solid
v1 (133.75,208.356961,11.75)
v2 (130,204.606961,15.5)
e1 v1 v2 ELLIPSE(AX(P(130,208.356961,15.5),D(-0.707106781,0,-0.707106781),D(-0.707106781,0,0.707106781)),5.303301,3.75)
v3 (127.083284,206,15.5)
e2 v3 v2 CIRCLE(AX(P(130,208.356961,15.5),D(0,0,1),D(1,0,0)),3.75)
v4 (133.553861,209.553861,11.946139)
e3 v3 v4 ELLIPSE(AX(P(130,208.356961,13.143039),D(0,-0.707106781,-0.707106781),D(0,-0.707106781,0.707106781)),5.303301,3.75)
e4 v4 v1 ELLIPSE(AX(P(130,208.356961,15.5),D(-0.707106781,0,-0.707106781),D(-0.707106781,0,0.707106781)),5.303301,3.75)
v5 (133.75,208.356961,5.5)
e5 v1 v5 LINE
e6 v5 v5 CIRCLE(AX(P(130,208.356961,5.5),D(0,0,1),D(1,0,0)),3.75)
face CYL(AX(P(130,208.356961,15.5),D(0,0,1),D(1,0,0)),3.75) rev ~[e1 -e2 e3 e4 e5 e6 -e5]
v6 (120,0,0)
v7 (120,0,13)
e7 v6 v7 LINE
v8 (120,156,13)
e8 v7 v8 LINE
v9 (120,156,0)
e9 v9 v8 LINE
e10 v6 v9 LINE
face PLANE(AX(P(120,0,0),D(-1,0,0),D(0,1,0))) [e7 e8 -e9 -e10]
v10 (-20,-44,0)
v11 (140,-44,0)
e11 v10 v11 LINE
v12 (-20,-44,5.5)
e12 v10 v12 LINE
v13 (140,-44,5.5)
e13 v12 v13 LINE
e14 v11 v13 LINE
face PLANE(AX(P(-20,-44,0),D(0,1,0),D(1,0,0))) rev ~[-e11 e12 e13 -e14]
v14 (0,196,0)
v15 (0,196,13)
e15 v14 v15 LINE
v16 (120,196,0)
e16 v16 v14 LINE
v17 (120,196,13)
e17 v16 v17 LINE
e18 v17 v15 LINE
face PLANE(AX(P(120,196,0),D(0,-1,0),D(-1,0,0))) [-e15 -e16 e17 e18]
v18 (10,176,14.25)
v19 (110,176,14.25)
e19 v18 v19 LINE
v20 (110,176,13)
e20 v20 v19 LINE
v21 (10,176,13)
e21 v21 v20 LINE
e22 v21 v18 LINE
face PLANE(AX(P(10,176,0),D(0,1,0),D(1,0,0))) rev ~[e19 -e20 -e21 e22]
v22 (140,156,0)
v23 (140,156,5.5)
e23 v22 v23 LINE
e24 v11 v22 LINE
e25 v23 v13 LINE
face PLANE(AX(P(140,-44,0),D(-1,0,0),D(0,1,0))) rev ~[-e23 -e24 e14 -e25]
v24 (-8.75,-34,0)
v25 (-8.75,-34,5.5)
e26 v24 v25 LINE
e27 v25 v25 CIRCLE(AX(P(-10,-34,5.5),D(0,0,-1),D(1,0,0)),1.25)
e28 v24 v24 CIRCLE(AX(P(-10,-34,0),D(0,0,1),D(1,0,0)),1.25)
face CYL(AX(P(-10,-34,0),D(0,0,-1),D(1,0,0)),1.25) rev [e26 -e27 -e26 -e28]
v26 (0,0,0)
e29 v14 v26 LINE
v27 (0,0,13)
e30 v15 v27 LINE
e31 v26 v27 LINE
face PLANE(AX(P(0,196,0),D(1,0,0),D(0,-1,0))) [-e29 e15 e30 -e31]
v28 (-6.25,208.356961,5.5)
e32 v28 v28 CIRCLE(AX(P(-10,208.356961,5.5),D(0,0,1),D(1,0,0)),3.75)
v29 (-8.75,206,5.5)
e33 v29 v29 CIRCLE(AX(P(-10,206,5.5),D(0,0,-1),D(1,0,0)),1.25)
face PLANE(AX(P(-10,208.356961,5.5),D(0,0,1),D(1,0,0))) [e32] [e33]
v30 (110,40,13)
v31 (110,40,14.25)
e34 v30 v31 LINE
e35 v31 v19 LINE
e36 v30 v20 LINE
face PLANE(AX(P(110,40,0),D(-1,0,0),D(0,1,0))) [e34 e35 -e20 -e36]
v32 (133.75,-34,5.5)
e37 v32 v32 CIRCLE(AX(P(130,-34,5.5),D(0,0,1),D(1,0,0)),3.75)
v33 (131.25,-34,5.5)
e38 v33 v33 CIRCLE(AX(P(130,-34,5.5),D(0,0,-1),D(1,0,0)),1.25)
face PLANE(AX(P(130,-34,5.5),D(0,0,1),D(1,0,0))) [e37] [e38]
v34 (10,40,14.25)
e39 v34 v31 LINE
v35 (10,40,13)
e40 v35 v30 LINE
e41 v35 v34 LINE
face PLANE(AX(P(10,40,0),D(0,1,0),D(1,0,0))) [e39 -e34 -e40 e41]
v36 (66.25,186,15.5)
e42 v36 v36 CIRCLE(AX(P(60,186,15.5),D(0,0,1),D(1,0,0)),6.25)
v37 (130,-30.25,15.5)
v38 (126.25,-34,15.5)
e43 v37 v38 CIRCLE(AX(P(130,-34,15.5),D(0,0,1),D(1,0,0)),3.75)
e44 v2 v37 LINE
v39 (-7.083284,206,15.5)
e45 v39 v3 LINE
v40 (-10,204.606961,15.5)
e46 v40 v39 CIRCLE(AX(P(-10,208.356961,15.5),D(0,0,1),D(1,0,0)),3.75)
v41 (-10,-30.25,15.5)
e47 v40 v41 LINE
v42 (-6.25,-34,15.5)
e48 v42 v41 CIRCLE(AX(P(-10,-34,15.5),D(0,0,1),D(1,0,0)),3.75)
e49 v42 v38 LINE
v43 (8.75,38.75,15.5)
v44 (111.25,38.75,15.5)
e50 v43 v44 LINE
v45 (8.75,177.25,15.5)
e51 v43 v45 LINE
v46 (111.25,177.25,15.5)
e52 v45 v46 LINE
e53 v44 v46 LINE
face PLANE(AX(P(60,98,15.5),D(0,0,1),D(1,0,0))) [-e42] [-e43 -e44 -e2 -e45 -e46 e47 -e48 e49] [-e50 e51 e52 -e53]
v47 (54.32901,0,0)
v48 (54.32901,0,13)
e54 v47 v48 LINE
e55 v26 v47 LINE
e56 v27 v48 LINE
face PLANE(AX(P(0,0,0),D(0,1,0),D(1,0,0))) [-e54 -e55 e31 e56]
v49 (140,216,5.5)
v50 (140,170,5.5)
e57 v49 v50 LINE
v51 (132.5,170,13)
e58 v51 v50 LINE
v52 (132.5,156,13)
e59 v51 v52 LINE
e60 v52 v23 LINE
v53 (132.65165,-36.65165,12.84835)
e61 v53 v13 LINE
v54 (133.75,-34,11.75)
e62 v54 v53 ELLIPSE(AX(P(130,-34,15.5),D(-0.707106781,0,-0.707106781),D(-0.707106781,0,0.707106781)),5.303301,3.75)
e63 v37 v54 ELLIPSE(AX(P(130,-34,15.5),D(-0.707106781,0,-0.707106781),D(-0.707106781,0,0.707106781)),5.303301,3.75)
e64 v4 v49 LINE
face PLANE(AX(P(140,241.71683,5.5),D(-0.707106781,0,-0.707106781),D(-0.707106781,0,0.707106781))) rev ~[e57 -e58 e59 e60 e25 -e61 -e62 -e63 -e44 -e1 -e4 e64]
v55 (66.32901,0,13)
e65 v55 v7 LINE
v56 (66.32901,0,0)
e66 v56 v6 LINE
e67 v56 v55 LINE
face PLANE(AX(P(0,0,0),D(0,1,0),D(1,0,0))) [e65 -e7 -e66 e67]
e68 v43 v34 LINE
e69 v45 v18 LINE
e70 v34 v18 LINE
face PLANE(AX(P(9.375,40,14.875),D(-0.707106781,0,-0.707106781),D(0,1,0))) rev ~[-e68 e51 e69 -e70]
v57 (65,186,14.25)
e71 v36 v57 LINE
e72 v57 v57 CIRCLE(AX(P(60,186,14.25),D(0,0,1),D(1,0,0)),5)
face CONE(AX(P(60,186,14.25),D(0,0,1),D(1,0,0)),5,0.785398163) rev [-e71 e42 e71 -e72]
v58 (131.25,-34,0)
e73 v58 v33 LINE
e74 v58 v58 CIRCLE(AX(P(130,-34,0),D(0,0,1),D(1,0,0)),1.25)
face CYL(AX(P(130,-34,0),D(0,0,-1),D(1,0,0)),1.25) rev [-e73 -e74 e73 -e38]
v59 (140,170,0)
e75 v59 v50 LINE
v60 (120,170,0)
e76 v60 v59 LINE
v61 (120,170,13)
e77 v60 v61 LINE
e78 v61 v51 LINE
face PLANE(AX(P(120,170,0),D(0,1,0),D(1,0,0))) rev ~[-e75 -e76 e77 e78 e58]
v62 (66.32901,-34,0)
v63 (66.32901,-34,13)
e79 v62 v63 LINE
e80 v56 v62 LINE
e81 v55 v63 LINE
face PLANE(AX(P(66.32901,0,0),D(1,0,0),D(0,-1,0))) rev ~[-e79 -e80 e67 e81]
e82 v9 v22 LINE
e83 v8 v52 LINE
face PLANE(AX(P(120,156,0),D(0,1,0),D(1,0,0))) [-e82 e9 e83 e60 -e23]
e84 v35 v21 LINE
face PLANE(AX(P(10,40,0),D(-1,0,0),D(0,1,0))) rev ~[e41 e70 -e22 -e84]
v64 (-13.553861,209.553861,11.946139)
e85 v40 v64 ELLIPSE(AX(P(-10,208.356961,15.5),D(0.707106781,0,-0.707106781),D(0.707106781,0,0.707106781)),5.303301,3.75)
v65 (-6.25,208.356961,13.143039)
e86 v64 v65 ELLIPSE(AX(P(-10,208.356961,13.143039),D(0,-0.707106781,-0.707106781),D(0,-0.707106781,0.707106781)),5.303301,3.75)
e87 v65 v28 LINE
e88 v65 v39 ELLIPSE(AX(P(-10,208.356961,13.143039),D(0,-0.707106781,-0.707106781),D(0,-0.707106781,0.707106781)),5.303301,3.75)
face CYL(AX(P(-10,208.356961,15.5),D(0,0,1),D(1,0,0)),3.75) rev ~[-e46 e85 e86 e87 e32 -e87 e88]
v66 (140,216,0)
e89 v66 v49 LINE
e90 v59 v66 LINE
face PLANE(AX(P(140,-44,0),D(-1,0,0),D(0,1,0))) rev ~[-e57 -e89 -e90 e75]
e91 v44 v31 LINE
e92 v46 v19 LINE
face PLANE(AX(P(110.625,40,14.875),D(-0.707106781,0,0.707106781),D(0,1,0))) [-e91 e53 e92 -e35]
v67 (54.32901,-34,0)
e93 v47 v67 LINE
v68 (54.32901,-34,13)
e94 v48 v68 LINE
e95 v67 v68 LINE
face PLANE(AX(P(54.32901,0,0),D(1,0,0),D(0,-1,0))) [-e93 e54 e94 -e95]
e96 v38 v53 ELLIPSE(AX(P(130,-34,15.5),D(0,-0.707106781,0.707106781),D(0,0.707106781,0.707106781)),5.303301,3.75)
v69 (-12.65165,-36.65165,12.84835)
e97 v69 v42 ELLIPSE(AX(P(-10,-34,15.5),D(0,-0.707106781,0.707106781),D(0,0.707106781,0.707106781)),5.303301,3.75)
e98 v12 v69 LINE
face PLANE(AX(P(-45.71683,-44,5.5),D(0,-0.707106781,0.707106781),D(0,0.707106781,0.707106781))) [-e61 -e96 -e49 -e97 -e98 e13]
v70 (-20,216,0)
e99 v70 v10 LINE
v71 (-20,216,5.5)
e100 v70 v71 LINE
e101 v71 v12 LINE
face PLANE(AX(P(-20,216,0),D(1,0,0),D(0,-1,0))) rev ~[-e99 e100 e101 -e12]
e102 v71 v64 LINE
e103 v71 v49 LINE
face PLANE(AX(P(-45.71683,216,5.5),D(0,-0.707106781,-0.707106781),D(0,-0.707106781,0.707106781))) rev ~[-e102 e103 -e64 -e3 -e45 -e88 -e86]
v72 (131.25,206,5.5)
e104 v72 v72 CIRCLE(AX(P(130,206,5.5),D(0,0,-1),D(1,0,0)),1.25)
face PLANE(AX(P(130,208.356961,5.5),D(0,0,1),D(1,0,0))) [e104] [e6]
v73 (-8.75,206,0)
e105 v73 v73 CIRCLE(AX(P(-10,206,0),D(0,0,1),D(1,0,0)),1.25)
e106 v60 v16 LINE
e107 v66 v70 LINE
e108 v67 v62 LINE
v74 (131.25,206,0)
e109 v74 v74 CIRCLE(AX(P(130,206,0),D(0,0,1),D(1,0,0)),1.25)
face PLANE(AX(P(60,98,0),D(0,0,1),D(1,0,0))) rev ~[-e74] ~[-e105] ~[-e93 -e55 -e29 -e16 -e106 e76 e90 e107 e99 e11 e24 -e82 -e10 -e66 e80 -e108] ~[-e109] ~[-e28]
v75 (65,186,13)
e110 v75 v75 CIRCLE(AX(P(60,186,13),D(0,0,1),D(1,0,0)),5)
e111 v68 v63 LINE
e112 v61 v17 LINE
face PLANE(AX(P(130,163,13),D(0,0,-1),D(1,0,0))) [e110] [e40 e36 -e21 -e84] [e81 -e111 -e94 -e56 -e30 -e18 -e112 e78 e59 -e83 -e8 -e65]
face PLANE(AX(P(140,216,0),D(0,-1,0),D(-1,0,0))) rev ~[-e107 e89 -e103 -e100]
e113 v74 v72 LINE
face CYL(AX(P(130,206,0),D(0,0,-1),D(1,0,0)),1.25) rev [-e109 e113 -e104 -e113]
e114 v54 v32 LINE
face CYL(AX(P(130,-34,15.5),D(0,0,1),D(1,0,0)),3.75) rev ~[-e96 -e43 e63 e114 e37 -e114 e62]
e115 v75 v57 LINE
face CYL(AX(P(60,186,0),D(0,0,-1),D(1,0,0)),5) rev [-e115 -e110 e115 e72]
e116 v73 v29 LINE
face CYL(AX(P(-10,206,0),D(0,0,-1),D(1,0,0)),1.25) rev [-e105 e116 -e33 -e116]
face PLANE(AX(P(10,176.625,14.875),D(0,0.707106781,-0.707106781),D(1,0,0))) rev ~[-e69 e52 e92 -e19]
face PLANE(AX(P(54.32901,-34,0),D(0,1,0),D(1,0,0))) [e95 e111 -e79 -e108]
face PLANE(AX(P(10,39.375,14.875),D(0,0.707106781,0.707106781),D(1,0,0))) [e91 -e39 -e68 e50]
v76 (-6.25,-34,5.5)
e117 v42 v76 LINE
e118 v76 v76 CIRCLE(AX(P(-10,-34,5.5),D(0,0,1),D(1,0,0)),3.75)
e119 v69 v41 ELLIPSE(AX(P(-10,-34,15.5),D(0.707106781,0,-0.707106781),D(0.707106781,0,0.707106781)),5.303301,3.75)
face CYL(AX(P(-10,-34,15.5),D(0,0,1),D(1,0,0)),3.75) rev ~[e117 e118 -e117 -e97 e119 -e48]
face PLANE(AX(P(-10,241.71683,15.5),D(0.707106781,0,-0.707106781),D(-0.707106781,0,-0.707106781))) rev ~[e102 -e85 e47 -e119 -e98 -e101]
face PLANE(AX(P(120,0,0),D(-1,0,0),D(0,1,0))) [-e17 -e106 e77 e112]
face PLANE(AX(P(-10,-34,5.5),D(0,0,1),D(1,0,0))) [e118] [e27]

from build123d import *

# Parameters (mm, degrees)
F0_W        = 100
F0_H        = 136
F0_R        = 5
F0_R_2      = 3.75
F0_R_3      = 1.25
F0_W_2      = 12
F0_H_2      = 44
F1_DEPTH    = 15.5
F2_DEPTH    = 13
F4_R        = 3.75
F5_DEPTH    = 10
F6_T1_DEPTH = 211.4336597593
F6_T3_DEPTH = 311.4336597593
F7_SIZE     = 1.25
F8_SIZE     = 1.25
F9_W        = 12
F9_H        = 34
F9_W_2      = 20
F9_H_2      = 14
F10_DEPTH   = 13


# Not quite as in the source:
# - a fillet or chamfer that OpenCascade refuses, or shapes differently, is made with other operations: its cross-section is extruded or revolved along the edge and cut away or added


with BuildPart() as f1:
    # F0 (on Top) → F1 (new body)
    with BuildSketch(Plane.XY):
        Polygon((0, 196), (0, 0), (54, 0), (66, 0), (120, 0), (120, 196), align=None)
        with Locations((60, 108)):
            Rectangle(F0_W, F0_H, mode=Mode.SUBTRACT)
        with Locations((60, 186)):
            Circle(F0_R, mode=Mode.SUBTRACT)
        Polygon((54, 0), (0, 0), (0, 196), (120, 196), (120, 0), (66, 0), (66, -44), (140, -44), (140, 216), (-20, 216), (-20, -44), (54, -44), align=None)
        with Locations((-10, -34)):
            Circle(F0_R_2, mode=Mode.SUBTRACT)
        with Locations((130, -34)):
            Circle(F0_R_2, mode=Mode.SUBTRACT)
        with Locations((-10, 206)):
            Circle(F0_R_2, mode=Mode.SUBTRACT)
        with Locations((130, 206)):
            Circle(F0_R_2, mode=Mode.SUBTRACT)
        with Locations((130, -34)):
            Circle(F0_R_2)
        with Locations((130, -34)):
            Circle(F0_R_3, mode=Mode.SUBTRACT)
        with Locations((-10, -34)):
            Circle(F0_R_2)
        with Locations((-10, -34)):
            Circle(F0_R_3, mode=Mode.SUBTRACT)
        with Locations((-10, 206)):
            Circle(F0_R_2)
        with Locations((-10, 206)):
            Circle(F0_R_3, mode=Mode.SUBTRACT)
        with Locations((130, 206)):
            Circle(F0_R_2)
        with Locations((130, 206)):
            Circle(F0_R_3, mode=Mode.SUBTRACT)
        with Locations((60, -22)):
            Rectangle(F0_W_2, F0_H_2)
    extrude(amount=F1_DEPTH)

    # F0 (on Top) → F2 (cut)
    with BuildSketch(Plane.XY):
        Polygon((0, 196), (0, 0), (54, 0), (66, 0), (120, 0), (120, 196), align=None)
        with Locations((60, 108)):
            Rectangle(F0_W, F0_H, mode=Mode.SUBTRACT)
        with Locations((60, 186)):
            Circle(F0_R, mode=Mode.SUBTRACT)
    extrude(amount=F2_DEPTH, mode=Mode.SUBTRACT)

    # F4 (on offset) → F5 (cut)
    with BuildSketch(Plane.XY.offset(15.5)):
        with Locations((130, 208.356961264)):
            Circle(F4_R)
        with Locations((-10, 208.356961264)):
            Circle(F4_R)
        with Locations((130, -34)):
            Circle(F4_R)
        with Locations((-10, -34)):
            Circle(F4_R)
    extrude(amount=-F5_DEPTH, mode=Mode.SUBTRACT)

    # F6: chamfer of 10 on 4 edges, made by hand

    # F6_s2 → F6_t1 (cut)
    with BuildSketch(Plane.YZ.offset(-45.7168298797)):
        Polygon((216, 5.5), (206, 15.5), (216, 15.5), align=None)
        Polygon((-44, 5.5), (-34, 15.5), (-44, 15.5), align=None)
    extrude(amount=F6_T1_DEPTH, mode=Mode.SUBTRACT)

    # F6_s4 → F6_t3 (cut)
    with BuildSketch(Plane.XZ.offset(-241.7168298797)):
        Polygon((140, 5.5), (130, 15.5), (140, 15.5), align=None)
        Polygon((-10, 15.5), (-20, 5.5), (-20, 15.5), align=None)
    extrude(amount=F6_T3_DEPTH, mode=Mode.SUBTRACT)

    # F7
    f7_edges = [f1.edges().sort_by_distance(p)[0] for p in [
        (55, 186, 15.5),
    ]]
    chamfer(f7_edges, length=F7_SIZE)

    # F8
    f8_edges = [f1.edges().sort_by_distance(p)[0] for p in [
        (110, 108, 15.5),
        (60, 176, 15.5),
        (10, 108, 15.5),
        (60, 40, 15.5),
    ]]
    chamfer(f8_edges, length=F8_SIZE)

    # F9 (on face) → F10 (cut)
    with BuildSketch(Plane(origin=(0, 0, 0), x_dir=(1, 0, 0), z_dir=(0, 0, -1))):
        with Locations((60.329009831, 17)):
            Rectangle(F9_W, F9_H)
        with Locations((130, -163)):
            Rectangle(F9_W_2, F9_H_2)
    extrude(amount=-F10_DEPTH, mode=Mode.SUBTRACT)


solid = f1.part
